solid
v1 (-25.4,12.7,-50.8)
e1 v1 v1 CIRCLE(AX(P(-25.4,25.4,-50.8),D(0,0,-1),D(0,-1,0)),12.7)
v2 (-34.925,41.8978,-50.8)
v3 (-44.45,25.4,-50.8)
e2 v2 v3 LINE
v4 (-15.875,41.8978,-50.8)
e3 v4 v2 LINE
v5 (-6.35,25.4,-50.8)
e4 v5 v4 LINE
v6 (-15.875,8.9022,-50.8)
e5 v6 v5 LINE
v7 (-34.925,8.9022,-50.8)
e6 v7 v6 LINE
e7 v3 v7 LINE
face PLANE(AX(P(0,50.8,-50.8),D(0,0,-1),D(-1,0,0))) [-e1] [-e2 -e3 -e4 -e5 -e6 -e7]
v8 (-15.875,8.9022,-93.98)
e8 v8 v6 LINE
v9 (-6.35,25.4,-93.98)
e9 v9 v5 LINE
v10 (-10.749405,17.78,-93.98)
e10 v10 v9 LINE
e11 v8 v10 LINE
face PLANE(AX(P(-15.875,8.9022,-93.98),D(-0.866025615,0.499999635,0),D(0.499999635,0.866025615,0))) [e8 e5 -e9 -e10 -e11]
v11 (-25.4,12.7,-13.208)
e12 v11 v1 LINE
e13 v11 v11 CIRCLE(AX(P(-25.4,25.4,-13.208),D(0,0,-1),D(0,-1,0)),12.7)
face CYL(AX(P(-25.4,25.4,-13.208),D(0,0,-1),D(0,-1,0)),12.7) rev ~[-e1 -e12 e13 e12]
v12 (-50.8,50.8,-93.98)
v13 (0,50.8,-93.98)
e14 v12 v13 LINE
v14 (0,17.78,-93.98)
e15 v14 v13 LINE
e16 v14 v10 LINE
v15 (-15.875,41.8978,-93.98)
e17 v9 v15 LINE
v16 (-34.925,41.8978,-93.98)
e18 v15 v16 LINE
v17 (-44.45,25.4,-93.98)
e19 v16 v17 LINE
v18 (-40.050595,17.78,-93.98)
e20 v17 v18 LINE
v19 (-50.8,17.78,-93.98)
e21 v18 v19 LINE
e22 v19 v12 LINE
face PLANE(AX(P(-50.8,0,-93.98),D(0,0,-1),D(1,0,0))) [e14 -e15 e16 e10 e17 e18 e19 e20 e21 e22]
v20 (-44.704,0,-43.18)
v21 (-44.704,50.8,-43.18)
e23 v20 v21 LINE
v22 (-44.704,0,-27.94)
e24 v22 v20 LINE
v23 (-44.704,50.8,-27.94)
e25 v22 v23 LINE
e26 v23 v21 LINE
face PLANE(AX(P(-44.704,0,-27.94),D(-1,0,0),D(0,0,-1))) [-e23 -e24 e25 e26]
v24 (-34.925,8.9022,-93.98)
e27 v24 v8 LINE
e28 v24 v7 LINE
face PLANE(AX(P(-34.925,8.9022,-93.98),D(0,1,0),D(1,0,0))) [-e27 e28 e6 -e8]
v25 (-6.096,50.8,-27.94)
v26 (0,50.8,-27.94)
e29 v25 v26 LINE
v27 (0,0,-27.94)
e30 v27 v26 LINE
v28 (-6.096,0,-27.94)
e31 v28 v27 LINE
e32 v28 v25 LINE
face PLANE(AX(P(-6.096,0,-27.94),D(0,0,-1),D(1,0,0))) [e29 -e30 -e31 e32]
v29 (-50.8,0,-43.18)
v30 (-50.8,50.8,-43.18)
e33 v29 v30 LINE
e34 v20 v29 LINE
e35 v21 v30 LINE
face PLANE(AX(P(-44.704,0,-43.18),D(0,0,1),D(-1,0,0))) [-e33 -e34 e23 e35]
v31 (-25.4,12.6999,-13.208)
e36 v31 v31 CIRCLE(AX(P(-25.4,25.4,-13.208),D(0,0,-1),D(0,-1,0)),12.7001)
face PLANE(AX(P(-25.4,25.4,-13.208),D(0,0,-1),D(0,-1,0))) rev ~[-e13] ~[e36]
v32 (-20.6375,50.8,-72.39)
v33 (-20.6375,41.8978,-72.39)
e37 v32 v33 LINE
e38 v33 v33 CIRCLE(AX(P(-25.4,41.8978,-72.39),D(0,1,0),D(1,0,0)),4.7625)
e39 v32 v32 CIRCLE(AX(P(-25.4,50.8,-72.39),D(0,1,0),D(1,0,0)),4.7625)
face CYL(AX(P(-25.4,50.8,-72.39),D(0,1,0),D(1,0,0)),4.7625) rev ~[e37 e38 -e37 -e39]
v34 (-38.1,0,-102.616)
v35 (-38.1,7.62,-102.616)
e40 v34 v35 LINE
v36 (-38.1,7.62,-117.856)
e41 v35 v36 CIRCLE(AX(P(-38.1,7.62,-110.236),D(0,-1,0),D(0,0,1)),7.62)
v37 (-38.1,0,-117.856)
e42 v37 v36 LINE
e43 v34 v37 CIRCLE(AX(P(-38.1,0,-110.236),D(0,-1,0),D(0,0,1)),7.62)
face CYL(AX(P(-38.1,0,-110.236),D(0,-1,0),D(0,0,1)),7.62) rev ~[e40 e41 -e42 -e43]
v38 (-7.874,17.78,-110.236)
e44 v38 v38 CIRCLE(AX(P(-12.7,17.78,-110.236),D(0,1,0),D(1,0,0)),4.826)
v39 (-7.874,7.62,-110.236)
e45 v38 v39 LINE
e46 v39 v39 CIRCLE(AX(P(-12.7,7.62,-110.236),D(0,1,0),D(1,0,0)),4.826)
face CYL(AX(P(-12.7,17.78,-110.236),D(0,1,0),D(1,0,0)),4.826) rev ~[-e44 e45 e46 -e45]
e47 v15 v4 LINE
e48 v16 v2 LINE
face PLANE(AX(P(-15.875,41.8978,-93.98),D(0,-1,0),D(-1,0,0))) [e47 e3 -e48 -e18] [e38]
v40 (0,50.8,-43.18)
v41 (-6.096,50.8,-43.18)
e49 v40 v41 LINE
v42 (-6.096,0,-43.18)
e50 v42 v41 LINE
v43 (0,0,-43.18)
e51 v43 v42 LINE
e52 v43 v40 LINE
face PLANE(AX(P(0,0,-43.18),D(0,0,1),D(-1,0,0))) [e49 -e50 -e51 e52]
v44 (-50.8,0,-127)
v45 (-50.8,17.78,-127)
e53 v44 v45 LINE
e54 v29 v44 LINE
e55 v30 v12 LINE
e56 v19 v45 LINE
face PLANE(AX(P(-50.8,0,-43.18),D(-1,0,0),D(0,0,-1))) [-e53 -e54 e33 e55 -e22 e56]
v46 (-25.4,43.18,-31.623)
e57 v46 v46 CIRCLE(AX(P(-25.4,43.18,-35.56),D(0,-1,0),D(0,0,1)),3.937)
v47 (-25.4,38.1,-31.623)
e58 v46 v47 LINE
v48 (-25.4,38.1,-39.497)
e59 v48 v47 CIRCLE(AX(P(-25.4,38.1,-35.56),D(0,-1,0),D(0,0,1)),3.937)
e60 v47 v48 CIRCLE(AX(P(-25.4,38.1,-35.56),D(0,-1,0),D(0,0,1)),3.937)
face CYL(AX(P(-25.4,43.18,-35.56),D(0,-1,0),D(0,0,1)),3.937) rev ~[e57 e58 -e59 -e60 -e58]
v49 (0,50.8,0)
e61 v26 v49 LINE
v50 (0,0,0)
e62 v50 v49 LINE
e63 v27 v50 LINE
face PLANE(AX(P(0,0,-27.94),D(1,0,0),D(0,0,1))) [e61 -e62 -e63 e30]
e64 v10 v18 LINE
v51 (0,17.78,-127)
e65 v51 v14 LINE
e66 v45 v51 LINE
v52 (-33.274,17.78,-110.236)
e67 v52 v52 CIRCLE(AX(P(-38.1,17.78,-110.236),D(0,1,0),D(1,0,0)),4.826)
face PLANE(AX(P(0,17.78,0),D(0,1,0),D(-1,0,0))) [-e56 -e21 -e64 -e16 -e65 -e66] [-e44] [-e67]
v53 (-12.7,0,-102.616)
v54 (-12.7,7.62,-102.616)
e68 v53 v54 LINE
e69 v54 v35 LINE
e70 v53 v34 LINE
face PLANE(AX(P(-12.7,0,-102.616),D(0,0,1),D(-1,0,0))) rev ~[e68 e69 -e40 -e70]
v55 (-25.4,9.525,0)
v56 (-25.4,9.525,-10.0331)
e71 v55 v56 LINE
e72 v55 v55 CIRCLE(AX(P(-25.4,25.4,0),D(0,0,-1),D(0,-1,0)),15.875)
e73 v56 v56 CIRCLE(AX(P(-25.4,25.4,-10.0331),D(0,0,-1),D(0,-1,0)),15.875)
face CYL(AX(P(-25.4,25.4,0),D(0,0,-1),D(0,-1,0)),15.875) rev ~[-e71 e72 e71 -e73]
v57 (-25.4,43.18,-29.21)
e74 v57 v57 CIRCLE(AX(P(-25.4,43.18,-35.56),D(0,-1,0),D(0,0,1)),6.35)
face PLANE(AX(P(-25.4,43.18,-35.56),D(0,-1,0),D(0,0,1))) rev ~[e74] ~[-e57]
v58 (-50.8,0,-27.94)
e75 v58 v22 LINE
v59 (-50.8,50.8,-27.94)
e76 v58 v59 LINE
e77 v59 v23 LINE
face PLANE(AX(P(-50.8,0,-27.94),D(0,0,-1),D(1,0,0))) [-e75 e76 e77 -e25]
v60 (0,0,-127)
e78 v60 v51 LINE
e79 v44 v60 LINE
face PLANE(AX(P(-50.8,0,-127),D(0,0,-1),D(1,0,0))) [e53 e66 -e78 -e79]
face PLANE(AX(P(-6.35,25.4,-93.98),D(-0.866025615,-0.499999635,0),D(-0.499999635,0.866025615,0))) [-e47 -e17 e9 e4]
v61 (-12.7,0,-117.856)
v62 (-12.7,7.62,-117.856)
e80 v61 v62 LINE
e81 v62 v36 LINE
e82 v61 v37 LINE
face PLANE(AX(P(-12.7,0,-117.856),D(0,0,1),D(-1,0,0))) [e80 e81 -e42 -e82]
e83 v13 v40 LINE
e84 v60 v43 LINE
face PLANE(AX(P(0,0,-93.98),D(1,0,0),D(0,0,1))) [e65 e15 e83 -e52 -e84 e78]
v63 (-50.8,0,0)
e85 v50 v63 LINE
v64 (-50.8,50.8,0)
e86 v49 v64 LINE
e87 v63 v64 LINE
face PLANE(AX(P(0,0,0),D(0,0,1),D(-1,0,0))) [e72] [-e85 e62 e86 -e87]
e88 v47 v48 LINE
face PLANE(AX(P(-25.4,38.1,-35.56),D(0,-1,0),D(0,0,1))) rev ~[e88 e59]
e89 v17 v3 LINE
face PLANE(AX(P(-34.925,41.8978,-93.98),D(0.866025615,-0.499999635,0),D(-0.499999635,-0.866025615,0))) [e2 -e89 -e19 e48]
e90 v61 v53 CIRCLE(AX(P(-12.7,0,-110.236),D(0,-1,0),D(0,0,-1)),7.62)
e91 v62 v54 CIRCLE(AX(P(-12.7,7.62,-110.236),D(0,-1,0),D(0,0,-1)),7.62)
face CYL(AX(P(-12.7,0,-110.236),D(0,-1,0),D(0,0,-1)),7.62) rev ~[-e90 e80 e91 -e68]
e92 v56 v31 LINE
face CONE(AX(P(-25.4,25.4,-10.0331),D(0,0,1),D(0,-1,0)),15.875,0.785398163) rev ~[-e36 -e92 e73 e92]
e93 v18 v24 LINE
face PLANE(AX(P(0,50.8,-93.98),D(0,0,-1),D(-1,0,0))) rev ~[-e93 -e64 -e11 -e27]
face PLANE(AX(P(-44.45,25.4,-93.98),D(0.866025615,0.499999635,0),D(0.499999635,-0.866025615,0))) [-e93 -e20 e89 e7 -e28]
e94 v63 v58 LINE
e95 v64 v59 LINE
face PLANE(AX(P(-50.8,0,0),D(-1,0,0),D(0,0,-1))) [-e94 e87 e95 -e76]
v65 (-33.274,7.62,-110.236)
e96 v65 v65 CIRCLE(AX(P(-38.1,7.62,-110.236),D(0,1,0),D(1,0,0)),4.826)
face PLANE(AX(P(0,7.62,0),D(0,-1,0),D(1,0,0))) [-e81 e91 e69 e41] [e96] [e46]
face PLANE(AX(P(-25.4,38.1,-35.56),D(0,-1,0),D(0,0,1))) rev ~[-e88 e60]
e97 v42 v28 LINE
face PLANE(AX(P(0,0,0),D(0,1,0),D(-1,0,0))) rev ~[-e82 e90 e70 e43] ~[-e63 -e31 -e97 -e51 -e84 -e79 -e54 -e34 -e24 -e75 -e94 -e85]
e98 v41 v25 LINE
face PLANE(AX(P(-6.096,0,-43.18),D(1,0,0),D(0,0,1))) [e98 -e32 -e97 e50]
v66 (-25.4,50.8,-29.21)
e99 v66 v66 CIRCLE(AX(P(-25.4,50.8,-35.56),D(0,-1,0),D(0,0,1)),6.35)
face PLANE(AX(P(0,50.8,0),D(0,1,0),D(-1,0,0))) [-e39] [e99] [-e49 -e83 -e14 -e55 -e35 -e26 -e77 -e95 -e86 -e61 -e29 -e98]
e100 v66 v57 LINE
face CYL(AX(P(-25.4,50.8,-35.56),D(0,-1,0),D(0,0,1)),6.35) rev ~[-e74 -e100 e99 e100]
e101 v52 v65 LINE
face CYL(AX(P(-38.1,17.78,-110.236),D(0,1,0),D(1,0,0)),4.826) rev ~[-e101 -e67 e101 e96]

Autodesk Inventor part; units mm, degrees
ref_plane "YZ Plane" through (0, 0, 0) normal (1, 0, 0) x (0, 1, 0)
ref_plane "XZ Plane" through (0, 0, 0) normal (0, 1, 0) x (-1, 0, 0)
ref_plane "XY Plane" through (0, 0, 0) normal (0, 0, 1) x (1, 0, 0)
sketch "Boceto1" plane through (0, 0, 0) normal (0, 1, 0) x (-1, 0, 0)
  line L0 (0, 0) -> (50.8, 0)
  line L1 (50.8, -93.98) -> (0, -93.98)
  line L2 (50.8, -27.94) -> (44.704, -27.94)
  line L3 (44.704, -27.94) -> (44.704, -43.18)
  line L4 (44.704, -43.18) -> (50.8, -43.18)
  line L5 (6.096, -27.94) -> (0, -27.94)
  line L6 (0, -43.18) -> (6.096, -43.18)
  line L7 (6.096, -43.18) -> (6.096, -27.94)
  line L8 (50.8, 0) -> (50.8, -27.94)
  line L9 (50.8, -43.18) -> (50.8, -93.98)
  line L10 (0, -93.98) -> (0, -43.18)
  line L11 (0, -27.94) -> (0, 0)
  dimension "d0" = 50.8
  dimension "d1" = 93.98
  dimension "d2" = 27.94
  dimension "d3" = 15.24
  dimension "d5" = 27.94
  dimension "d6" = 15.24
extrude "BaseAlta" add sketch "Boceto1" along normal blind 50.8
sketch "Boceto2" plane through (0, 0, 0) normal (0, 1, 0) x (-1, 0, 0)
  line L0 (0, -93.98) -> (50.8, -93.98) projected
  line L1 (0, -93.98) -> (50.8, -93.98)
  line L2 (50.8, -93.98) -> (50.8, -127)
  line L3 (50.8, -127) -> (0, -127)
  line L4 (0, -127) -> (0, -93.98)
  point P0 (0, 0)
  dimension "d10" = 50.8
  dimension "d11" = 33.02
extrude "BaseBaja" add sketch "Boceto2" along normal blind 17.78
sketch "Boceto4" plane through (0, 50.8, -93.98) normal (0, 0, -1) x (-1, 0, 0)
  circle A0 centre (25.4, -25.4) radius 19.05 construction
  line L0 (0, -50.8) -> (50.8, -50.8) construction
  line L1 (0, -33.02) -> (0, 0) construction
  line L2 (6.35, -25.4) -> (15.875, -8.9022)
  line L3 (15.875, -8.9022) -> (34.925, -8.9022)
  line L4 (34.925, -8.9022) -> (44.45, -25.4)
  line L5 (44.45, -25.4) -> (34.925, -41.8978)
  line L6 (34.925, -41.8978) -> (15.875, -41.8978)
  line L7 (15.875, -41.8978) -> (6.35, -25.4)
  dimension "d19" = 38.1
  dimension "d20" = 25.4
  dimension "d21" = 25.4
extrude "Hexagono" cut sketch "Boceto4" against normal blind 43.18
sketch "Boceto6" plane through (0, 17.78, 0) normal (0, 1, 0) x (1, 0, 0)
  circle A0 centre (-38.1, 110.236) radius 4.826
  circle A1 centre (-12.7, 110.236) radius 4.826
  line L0 (0, 127) -> (-50.8, 127) projected
  line L1 (-50.8, 127) -> (-50.8, 93.98) projected
  line L2 (0, 93.98) -> (0, 127) projected
  point P0 (0, 0)
  dimension "d35" = 9.652
  dimension "d36" = 9.652
  dimension "d37" = 16.764
  dimension "d38" = 16.764
  dimension "d39" = 12.7
  dimension "d40" = 12.7
  dimension "d41" = 25.4
extrude "DosAgujeros" cut sketch "Boceto6" against normal blind 10.16
sketch "Boceto7" plane through (0, 0, 0) normal (0, -1, 0) x (1, 0, 0)
  circle A0 centre (-12.7, -110.236) radius 4.826 construction
  circle A1 centre (-38.1, -110.236) radius 4.826 construction
  arc A2 (-12.7, -117.856) -> (-12.7, -102.616) centre (-12.7, -110.236) ccw
  arc A3 (-38.1, -102.616) -> (-38.1, -117.856) centre (-38.1, -110.236) ccw
  line L0 (-12.7, -117.856) -> (-38.1, -117.856)
  line L1 (-12.7, -102.616) -> (-38.1, -102.616)
  line L2 (0, -43.18) -> (0, -127) projected
  line L3 (0, -127) -> (-50.8, -127) projected
  line L4 (-50.8, -127) -> (-50.8, -43.18) projected
  point P0 (0, 0)
  dimension "d44" = 15.24
  dimension "d45" = 15.24
  dimension "d46" = 12.7
  dimension "d47" = 16.764
  dimension "d48" = 12.7
  dimension "d49" = 16.764
extrude "AgujeroInferior" cut sketch "Boceto7" against normal blind 7.62
sketch "Boceto8" plane through (-50.8, 0, 0) normal (0, 0, 1) x (1, 0, 0)
  line L0 (0, 0) -> (50.8, 0) projected
  line L1 (0, 0) -> (0, 50.8) projected
  point P0 (25.4, 25.4)
  dimension "d52" = 25.4
  dimension "d53" = 25.4
hole "Agujero" at (-25.4, 25.4, 0) direction (0, 0, -1) diameter 25.4 depth 50.8 tip angle 118 counterbore diameter 31.75 counterbore depth 13.208
sketch "Boceto9" plane through (0, 50.8, 0) normal (0, 1, 0) x (1, 0, 0)
  circle A0 centre (-25.4, 72.39) radius 4.7625
  line L0 (-50.8, 93.98) -> (-50.8, 43.18) projected
  line L1 (0, 93.98) -> (-50.8, 93.98) projected
  point P0 (0, 0)
  dimension "d61" = 9.525
  dimension "d62" = 25.4
  dimension "d63" = 21.59
extrude "HoyoSuperior" cut sketch "Boceto9" against normal blind 12.7
sketch "Boceto10" plane through (0, 50.8, 0) normal (0, 1, 0) x (1, 0, 0)
  line L0 (-50.8, 27.94) -> (-50.8, 0) projected
  line L1 (-50.8, 0) -> (0, 0) projected
  point P0 (-25.4, 35.56)
  dimension "d66" = 25.4
  dimension "d67" = 35.56
hole "Agujero3" at (-25.4, 50.8, -35.56) direction (0, -1, 0) diameter 7.874 depth 12.7 counterbore diameter 12.7 counterbore depth 7.62
chamfer "Chaflán1" distance 3.175 angle 45 1 edges at (-25.4, 41.275, -13.208) measured on face at (-24.1336, 10.7371, -13.208)
equation "\"d38\" = d37"
properties part number "Box A01209499"
